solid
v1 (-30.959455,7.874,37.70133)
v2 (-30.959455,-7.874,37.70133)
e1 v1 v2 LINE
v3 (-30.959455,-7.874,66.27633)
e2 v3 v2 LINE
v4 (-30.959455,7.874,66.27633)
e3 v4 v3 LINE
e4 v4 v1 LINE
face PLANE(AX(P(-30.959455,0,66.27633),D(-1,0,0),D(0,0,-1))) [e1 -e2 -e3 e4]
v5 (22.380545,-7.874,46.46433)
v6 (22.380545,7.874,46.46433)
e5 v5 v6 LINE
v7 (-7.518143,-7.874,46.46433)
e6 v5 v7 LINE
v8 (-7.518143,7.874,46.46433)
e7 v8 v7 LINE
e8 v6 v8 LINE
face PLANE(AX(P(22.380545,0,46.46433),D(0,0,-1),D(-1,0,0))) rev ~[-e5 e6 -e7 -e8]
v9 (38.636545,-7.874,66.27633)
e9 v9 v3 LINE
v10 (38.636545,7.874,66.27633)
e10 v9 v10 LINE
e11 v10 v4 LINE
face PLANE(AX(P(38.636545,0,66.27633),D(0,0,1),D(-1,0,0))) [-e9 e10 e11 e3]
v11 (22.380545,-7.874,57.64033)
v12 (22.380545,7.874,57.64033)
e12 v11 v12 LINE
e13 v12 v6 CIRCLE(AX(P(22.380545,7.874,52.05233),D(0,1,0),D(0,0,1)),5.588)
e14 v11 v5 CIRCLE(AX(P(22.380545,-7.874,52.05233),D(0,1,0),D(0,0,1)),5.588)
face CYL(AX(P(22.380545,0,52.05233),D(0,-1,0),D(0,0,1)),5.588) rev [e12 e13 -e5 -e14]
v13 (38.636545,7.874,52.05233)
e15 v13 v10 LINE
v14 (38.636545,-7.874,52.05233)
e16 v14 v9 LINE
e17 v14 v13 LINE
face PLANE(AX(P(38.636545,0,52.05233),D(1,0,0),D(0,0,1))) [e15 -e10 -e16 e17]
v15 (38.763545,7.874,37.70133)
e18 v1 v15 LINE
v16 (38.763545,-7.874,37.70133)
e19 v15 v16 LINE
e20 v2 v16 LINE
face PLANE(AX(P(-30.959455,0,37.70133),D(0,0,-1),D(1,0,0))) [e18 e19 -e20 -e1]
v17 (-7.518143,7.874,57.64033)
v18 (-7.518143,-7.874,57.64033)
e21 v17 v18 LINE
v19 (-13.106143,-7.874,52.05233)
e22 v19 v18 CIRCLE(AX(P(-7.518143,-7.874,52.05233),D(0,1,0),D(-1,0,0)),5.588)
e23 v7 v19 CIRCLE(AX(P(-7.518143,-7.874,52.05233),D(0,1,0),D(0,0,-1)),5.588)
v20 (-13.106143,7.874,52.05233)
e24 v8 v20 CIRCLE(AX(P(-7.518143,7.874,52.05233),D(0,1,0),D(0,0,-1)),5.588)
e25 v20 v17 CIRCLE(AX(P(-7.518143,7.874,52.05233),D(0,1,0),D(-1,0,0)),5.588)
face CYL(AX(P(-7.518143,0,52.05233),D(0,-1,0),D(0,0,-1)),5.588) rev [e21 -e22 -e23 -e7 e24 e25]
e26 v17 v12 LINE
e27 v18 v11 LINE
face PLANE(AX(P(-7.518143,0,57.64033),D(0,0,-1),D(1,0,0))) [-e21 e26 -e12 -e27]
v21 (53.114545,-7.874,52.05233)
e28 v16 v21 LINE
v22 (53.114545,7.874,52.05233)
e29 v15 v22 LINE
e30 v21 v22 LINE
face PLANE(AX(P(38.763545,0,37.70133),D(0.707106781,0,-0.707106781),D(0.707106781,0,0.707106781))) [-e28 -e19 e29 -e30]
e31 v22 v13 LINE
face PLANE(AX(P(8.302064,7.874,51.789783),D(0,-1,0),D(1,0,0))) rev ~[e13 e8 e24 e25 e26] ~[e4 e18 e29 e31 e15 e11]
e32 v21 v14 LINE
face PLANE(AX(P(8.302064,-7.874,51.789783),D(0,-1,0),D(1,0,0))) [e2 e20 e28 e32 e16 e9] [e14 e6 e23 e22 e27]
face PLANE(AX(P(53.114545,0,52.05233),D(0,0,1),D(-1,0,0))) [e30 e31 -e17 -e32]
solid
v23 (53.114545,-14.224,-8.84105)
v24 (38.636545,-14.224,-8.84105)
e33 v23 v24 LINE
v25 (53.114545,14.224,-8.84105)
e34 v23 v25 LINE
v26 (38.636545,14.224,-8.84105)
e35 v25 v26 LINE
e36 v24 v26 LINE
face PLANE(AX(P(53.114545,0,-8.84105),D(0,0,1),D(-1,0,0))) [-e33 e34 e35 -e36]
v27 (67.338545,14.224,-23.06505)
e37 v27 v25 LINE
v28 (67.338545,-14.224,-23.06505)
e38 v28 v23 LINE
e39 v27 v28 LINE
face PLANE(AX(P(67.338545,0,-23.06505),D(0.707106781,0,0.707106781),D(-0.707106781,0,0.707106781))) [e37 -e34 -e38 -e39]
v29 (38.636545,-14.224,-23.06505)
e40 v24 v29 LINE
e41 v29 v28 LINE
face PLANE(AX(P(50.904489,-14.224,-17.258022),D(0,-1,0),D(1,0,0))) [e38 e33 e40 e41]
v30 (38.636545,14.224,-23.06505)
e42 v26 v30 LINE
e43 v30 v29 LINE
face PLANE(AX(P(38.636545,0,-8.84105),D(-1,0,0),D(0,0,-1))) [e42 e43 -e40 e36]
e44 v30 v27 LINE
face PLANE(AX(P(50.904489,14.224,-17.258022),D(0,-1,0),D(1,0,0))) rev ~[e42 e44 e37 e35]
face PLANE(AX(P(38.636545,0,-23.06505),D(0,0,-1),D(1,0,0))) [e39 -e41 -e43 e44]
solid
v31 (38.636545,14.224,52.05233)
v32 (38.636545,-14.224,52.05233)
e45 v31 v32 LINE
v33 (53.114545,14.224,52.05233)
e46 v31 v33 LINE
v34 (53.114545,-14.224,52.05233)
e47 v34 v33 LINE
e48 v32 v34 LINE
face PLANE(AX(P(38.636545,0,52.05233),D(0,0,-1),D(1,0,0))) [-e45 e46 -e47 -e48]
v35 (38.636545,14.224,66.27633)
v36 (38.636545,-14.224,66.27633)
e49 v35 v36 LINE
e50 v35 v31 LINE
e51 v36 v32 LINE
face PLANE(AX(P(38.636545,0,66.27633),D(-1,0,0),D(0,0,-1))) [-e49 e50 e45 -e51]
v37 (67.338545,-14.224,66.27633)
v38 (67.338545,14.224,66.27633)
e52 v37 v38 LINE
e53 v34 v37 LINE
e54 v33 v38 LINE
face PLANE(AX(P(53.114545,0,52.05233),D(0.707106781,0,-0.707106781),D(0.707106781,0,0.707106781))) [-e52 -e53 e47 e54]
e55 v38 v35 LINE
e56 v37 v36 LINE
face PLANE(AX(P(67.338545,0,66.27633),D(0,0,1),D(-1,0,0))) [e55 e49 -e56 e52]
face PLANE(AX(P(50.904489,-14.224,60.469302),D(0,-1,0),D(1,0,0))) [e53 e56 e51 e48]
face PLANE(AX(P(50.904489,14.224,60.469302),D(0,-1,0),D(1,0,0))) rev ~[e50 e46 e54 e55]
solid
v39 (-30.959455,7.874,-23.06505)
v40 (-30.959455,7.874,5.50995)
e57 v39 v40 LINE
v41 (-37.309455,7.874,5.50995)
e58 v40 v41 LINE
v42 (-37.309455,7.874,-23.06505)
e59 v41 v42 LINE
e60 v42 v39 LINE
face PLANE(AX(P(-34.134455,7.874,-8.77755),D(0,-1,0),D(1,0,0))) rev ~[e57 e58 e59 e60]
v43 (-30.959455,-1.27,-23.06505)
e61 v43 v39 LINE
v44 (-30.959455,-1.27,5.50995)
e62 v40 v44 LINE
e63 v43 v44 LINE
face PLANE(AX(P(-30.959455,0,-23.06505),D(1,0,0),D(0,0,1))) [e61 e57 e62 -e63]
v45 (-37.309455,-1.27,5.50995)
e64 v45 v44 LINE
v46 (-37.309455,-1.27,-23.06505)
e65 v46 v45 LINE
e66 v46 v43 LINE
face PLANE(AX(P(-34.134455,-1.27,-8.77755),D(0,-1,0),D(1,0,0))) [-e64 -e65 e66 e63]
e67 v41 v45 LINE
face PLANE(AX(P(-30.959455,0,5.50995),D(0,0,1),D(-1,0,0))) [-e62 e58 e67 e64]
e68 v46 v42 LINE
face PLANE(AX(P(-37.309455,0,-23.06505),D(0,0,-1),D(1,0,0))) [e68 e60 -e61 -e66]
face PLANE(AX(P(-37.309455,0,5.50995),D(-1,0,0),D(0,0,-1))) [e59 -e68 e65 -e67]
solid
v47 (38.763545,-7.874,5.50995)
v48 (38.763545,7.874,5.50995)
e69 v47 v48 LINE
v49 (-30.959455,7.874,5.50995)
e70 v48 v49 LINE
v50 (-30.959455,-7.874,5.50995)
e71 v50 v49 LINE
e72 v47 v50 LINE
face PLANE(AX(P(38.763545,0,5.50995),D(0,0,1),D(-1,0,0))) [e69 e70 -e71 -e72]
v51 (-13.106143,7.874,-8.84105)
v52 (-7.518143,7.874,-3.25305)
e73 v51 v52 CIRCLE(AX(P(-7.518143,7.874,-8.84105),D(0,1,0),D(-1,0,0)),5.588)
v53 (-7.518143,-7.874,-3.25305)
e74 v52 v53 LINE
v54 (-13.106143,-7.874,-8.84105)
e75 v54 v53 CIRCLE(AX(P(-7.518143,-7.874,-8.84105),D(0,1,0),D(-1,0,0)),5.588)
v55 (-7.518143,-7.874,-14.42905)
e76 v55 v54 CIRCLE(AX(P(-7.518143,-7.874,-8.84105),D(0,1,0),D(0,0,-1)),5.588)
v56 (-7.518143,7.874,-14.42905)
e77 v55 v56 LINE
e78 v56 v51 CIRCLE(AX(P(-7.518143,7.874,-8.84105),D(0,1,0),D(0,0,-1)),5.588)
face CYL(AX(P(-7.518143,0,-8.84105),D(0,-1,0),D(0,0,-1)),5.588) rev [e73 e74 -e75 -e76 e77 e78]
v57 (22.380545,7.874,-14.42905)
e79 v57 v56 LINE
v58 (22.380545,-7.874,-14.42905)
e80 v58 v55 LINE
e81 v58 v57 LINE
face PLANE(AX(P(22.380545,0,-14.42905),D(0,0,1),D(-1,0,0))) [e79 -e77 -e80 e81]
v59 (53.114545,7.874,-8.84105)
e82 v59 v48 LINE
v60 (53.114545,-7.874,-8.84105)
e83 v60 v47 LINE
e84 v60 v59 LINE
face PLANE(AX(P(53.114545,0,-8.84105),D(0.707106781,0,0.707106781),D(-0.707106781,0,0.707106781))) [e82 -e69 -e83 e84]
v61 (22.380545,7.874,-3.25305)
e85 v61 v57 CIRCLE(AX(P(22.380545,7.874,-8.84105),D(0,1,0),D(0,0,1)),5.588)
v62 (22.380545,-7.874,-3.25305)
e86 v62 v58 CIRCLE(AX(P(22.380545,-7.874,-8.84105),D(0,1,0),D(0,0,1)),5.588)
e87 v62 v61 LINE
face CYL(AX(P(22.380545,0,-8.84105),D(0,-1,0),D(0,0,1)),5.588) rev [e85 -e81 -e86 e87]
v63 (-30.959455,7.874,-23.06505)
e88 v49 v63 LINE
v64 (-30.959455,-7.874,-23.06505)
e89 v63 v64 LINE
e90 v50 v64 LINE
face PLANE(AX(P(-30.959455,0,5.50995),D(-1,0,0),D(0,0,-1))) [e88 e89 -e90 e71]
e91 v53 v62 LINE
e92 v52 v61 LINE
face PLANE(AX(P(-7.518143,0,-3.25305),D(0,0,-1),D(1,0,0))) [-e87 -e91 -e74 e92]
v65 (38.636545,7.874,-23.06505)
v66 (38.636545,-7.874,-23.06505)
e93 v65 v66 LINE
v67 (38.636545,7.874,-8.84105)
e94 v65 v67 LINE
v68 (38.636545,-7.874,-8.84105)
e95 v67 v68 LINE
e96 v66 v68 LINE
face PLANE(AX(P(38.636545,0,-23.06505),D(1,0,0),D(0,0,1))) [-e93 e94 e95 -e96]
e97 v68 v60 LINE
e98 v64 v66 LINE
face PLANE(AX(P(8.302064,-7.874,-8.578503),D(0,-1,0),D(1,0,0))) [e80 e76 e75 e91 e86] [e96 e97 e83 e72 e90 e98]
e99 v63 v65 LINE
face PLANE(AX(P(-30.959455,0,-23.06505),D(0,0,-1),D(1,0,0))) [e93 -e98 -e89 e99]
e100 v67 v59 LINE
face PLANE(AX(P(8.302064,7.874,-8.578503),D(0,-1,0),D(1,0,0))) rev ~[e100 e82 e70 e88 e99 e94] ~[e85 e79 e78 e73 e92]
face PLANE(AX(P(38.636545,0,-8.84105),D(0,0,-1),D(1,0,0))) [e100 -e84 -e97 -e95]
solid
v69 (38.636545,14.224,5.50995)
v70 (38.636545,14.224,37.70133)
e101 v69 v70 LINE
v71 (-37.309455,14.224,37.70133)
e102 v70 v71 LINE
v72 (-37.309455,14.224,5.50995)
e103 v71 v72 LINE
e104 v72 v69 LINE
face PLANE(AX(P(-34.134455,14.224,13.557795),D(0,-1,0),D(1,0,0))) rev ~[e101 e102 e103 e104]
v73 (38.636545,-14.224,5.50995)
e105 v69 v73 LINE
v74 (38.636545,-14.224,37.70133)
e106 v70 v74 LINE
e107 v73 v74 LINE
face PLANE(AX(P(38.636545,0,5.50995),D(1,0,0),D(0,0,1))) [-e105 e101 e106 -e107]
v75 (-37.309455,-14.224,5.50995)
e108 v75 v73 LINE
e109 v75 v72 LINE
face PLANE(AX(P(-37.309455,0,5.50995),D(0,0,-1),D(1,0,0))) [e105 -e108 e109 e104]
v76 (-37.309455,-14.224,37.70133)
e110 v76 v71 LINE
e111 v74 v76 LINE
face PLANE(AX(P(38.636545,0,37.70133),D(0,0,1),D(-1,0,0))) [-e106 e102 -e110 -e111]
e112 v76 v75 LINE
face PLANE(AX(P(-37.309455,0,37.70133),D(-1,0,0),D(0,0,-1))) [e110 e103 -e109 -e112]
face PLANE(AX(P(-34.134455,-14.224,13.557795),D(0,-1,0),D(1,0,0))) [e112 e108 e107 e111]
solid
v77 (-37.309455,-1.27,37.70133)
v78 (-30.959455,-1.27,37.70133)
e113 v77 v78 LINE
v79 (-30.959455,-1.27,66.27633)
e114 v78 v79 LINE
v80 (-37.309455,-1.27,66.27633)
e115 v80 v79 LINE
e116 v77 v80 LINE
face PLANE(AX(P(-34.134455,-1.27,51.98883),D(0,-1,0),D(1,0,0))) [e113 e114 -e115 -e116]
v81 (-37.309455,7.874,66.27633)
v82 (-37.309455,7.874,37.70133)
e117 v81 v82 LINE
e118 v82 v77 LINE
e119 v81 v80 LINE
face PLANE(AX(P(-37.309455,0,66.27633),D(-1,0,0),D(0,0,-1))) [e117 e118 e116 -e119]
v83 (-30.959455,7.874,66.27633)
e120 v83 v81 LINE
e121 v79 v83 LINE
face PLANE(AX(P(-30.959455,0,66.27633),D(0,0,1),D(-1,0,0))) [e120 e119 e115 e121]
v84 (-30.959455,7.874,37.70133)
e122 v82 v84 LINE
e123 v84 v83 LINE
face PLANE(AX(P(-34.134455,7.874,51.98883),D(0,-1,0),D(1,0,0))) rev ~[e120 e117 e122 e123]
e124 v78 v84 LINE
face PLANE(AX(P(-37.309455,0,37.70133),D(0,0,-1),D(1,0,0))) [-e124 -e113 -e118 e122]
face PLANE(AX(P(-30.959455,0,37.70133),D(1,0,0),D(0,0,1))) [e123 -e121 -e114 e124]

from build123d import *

# Parameters (mm, degrees)
F1_DEPTH  = 7.874
F2_DEPTH  = 14.224
F0_W      = 6.35
F0_H      = 16.0956901618
F0_W_2    = 69.596
F3_DEPTH  = 7.874
F3_FACE_W = 6.35
F3_FACE_H = 28.575
F4_DEPTH  = 6.604


with BuildPart() as f1:
    # F0 (on Front) → F1 (new body, symmetric)
    with BuildSketch(Plane.XZ):
        Polygon((38.6365454535, 5.5099498674), (-30.9594545465, 5.5099498674), (-30.9594545465, -23.0650501326), (38.6365454535, -23.0650501326), (38.6365454535, -8.8410501326), (53.1145454535, -8.8410501326), (38.7635454535, 5.5099498674), align=None)
        with BuildLine():
            ThreePointArc((-13.1061429274, -8.8410501326), (-11.4694556207, -4.8897374393), (-7.5181429274, -3.2530501326))
            Line((-7.5181429274, -3.2530501326), (22.3805454535, -3.2530501326))
            ThreePointArc((22.3805454535, -3.2530501326), (27.9685454535, -8.8410501326), (22.3805454535, -14.4290501326))
            Line((22.3805454535, -14.4290501326), (-7.5181429274, -14.4290501326))
            ThreePointArc((-7.5181429274, -14.4290501326), (-11.4694556207, -12.7923628258), (-13.1061429274, -8.8410501326))
        make_face(mode=Mode.SUBTRACT)
    extrude(amount=F1_DEPTH, both=True)


with BuildPart() as f1b:
    # F0 (on Front) → F1, piece 2 (new body, symmetric)
    with BuildSketch(Plane.XZ):
        Polygon((38.6365454535, 66.276330191), (-30.9594545465, 66.276330191), (-30.9594545465, 37.701330191), (38.6365454535, 37.701330191), (38.7635454535, 37.701330191), (53.1145454535, 52.052330191), (38.6365454535, 52.052330191), align=None)
        with BuildLine():
            Line((22.3805454535, 46.464330191), (-7.5181429274, 46.464330191))
            ThreePointArc((-7.5181429274, 46.464330191), (-11.4694556207, 48.1010174977), (-13.1061429274, 52.052330191))
            ThreePointArc((-13.1061429274, 52.052330191), (-11.4694556207, 56.0036428842), (-7.5181429274, 57.640330191))
            Line((-7.5181429274, 57.640330191), (22.3805454535, 57.640330191))
            ThreePointArc((22.3805454535, 57.640330191), (27.9685454535, 52.052330191), (22.3805454535, 46.464330191))
        make_face(mode=Mode.SUBTRACT)
    extrude(amount=F1_DEPTH, both=True)


with BuildPart() as f2:
    # F0 (on Front) → F2 (new body, symmetric)
    with BuildSketch(Plane.XZ):
        Polygon((38.6365454535, -8.8410501326), (38.6365454535, -23.0650501326), (67.3385454535, -23.0650501326), (53.1145454535, -8.8410501326), align=None)
    extrude(amount=F2_DEPTH, both=True)


with BuildPart() as f2b:
    # F0 (on Front) → F2, piece 2 (new body, symmetric)
    with BuildSketch(Plane.XZ):
        with Locations((-34.1344545465, 13.5577949483)):
            Rectangle(F0_W, F0_H)
        with Locations((3.8385454535, 13.5577949483)):
            Rectangle(F0_W_2, F0_H)
        with Locations((3.8385454535, 29.6534851101)):
            Rectangle(F0_W_2, F0_H)
        with Locations((-34.1344545465, 29.6534851101)):
            Rectangle(F0_W, F0_H)
    extrude(amount=F2_DEPTH, both=True)


with BuildPart() as f2c:
    # F0 (on Front) → F2, piece 3 (new body, symmetric)
    with BuildSketch(Plane.XZ):
        Polygon((67.3385454535, 66.276330191), (38.6365454535, 66.276330191), (38.6365454535, 52.052330191), (53.1145454535, 52.052330191), align=None)
    extrude(amount=F2_DEPTH, both=True)


with BuildPart() as f3:
    # F0 (on Front) → F3 (new body, symmetric)
    with BuildSketch(Plane.XZ):
        Polygon((-30.9594545465, 66.276330191), (-37.3094545465, 66.276330191), (-37.3094545465, 52.052330191), (-37.3094545465, 37.701330191), (-30.9594545465, 37.701330191), align=None)
    extrude(amount=F3_DEPTH, both=True)


with BuildPart() as f3b:
    # F0 (on Front) → F3, piece 2 (new body, symmetric)
    with BuildSketch(Plane.XZ):
        Polygon((-30.9594545465, -23.0650501326), (-30.9594545465, 5.5099498674), (-37.3094545465, 5.5099498674), (-37.3094545465, -8.8410501326), (-37.3094545465, -23.0650501326), align=None)
    extrude(amount=F3_DEPTH, both=True)


with BuildPart() as f4_tool:
    # F3_face (on face) → F4 (new body)
    with BuildSketch(Plane(origin=(-34.1344545465, -7.874, -8.7775501326), x_dir=(1, 0, 0), z_dir=(0, -1, 0))):
        Rectangle(F3_FACE_W, F3_FACE_H)
        with Locations((0, 60.7663803235)):
            Rectangle(F3_FACE_W, F3_FACE_H)
    extrude(amount=-F4_DEPTH)


with BuildPart() as f3_1:
    add(f3.part)

    # F4: cut by f4_tool
    add(f4_tool.part, mode=Mode.SUBTRACT)


with BuildPart() as f3b_1:
    add(f3b.part)

    # F4: cut by f4_tool
    add(f4_tool.part, mode=Mode.SUBTRACT)


solid = Compound([f1.part, f1b.part, f2.part, f2b.part, f2c.part, f3_1.part, f3b_1.part])
